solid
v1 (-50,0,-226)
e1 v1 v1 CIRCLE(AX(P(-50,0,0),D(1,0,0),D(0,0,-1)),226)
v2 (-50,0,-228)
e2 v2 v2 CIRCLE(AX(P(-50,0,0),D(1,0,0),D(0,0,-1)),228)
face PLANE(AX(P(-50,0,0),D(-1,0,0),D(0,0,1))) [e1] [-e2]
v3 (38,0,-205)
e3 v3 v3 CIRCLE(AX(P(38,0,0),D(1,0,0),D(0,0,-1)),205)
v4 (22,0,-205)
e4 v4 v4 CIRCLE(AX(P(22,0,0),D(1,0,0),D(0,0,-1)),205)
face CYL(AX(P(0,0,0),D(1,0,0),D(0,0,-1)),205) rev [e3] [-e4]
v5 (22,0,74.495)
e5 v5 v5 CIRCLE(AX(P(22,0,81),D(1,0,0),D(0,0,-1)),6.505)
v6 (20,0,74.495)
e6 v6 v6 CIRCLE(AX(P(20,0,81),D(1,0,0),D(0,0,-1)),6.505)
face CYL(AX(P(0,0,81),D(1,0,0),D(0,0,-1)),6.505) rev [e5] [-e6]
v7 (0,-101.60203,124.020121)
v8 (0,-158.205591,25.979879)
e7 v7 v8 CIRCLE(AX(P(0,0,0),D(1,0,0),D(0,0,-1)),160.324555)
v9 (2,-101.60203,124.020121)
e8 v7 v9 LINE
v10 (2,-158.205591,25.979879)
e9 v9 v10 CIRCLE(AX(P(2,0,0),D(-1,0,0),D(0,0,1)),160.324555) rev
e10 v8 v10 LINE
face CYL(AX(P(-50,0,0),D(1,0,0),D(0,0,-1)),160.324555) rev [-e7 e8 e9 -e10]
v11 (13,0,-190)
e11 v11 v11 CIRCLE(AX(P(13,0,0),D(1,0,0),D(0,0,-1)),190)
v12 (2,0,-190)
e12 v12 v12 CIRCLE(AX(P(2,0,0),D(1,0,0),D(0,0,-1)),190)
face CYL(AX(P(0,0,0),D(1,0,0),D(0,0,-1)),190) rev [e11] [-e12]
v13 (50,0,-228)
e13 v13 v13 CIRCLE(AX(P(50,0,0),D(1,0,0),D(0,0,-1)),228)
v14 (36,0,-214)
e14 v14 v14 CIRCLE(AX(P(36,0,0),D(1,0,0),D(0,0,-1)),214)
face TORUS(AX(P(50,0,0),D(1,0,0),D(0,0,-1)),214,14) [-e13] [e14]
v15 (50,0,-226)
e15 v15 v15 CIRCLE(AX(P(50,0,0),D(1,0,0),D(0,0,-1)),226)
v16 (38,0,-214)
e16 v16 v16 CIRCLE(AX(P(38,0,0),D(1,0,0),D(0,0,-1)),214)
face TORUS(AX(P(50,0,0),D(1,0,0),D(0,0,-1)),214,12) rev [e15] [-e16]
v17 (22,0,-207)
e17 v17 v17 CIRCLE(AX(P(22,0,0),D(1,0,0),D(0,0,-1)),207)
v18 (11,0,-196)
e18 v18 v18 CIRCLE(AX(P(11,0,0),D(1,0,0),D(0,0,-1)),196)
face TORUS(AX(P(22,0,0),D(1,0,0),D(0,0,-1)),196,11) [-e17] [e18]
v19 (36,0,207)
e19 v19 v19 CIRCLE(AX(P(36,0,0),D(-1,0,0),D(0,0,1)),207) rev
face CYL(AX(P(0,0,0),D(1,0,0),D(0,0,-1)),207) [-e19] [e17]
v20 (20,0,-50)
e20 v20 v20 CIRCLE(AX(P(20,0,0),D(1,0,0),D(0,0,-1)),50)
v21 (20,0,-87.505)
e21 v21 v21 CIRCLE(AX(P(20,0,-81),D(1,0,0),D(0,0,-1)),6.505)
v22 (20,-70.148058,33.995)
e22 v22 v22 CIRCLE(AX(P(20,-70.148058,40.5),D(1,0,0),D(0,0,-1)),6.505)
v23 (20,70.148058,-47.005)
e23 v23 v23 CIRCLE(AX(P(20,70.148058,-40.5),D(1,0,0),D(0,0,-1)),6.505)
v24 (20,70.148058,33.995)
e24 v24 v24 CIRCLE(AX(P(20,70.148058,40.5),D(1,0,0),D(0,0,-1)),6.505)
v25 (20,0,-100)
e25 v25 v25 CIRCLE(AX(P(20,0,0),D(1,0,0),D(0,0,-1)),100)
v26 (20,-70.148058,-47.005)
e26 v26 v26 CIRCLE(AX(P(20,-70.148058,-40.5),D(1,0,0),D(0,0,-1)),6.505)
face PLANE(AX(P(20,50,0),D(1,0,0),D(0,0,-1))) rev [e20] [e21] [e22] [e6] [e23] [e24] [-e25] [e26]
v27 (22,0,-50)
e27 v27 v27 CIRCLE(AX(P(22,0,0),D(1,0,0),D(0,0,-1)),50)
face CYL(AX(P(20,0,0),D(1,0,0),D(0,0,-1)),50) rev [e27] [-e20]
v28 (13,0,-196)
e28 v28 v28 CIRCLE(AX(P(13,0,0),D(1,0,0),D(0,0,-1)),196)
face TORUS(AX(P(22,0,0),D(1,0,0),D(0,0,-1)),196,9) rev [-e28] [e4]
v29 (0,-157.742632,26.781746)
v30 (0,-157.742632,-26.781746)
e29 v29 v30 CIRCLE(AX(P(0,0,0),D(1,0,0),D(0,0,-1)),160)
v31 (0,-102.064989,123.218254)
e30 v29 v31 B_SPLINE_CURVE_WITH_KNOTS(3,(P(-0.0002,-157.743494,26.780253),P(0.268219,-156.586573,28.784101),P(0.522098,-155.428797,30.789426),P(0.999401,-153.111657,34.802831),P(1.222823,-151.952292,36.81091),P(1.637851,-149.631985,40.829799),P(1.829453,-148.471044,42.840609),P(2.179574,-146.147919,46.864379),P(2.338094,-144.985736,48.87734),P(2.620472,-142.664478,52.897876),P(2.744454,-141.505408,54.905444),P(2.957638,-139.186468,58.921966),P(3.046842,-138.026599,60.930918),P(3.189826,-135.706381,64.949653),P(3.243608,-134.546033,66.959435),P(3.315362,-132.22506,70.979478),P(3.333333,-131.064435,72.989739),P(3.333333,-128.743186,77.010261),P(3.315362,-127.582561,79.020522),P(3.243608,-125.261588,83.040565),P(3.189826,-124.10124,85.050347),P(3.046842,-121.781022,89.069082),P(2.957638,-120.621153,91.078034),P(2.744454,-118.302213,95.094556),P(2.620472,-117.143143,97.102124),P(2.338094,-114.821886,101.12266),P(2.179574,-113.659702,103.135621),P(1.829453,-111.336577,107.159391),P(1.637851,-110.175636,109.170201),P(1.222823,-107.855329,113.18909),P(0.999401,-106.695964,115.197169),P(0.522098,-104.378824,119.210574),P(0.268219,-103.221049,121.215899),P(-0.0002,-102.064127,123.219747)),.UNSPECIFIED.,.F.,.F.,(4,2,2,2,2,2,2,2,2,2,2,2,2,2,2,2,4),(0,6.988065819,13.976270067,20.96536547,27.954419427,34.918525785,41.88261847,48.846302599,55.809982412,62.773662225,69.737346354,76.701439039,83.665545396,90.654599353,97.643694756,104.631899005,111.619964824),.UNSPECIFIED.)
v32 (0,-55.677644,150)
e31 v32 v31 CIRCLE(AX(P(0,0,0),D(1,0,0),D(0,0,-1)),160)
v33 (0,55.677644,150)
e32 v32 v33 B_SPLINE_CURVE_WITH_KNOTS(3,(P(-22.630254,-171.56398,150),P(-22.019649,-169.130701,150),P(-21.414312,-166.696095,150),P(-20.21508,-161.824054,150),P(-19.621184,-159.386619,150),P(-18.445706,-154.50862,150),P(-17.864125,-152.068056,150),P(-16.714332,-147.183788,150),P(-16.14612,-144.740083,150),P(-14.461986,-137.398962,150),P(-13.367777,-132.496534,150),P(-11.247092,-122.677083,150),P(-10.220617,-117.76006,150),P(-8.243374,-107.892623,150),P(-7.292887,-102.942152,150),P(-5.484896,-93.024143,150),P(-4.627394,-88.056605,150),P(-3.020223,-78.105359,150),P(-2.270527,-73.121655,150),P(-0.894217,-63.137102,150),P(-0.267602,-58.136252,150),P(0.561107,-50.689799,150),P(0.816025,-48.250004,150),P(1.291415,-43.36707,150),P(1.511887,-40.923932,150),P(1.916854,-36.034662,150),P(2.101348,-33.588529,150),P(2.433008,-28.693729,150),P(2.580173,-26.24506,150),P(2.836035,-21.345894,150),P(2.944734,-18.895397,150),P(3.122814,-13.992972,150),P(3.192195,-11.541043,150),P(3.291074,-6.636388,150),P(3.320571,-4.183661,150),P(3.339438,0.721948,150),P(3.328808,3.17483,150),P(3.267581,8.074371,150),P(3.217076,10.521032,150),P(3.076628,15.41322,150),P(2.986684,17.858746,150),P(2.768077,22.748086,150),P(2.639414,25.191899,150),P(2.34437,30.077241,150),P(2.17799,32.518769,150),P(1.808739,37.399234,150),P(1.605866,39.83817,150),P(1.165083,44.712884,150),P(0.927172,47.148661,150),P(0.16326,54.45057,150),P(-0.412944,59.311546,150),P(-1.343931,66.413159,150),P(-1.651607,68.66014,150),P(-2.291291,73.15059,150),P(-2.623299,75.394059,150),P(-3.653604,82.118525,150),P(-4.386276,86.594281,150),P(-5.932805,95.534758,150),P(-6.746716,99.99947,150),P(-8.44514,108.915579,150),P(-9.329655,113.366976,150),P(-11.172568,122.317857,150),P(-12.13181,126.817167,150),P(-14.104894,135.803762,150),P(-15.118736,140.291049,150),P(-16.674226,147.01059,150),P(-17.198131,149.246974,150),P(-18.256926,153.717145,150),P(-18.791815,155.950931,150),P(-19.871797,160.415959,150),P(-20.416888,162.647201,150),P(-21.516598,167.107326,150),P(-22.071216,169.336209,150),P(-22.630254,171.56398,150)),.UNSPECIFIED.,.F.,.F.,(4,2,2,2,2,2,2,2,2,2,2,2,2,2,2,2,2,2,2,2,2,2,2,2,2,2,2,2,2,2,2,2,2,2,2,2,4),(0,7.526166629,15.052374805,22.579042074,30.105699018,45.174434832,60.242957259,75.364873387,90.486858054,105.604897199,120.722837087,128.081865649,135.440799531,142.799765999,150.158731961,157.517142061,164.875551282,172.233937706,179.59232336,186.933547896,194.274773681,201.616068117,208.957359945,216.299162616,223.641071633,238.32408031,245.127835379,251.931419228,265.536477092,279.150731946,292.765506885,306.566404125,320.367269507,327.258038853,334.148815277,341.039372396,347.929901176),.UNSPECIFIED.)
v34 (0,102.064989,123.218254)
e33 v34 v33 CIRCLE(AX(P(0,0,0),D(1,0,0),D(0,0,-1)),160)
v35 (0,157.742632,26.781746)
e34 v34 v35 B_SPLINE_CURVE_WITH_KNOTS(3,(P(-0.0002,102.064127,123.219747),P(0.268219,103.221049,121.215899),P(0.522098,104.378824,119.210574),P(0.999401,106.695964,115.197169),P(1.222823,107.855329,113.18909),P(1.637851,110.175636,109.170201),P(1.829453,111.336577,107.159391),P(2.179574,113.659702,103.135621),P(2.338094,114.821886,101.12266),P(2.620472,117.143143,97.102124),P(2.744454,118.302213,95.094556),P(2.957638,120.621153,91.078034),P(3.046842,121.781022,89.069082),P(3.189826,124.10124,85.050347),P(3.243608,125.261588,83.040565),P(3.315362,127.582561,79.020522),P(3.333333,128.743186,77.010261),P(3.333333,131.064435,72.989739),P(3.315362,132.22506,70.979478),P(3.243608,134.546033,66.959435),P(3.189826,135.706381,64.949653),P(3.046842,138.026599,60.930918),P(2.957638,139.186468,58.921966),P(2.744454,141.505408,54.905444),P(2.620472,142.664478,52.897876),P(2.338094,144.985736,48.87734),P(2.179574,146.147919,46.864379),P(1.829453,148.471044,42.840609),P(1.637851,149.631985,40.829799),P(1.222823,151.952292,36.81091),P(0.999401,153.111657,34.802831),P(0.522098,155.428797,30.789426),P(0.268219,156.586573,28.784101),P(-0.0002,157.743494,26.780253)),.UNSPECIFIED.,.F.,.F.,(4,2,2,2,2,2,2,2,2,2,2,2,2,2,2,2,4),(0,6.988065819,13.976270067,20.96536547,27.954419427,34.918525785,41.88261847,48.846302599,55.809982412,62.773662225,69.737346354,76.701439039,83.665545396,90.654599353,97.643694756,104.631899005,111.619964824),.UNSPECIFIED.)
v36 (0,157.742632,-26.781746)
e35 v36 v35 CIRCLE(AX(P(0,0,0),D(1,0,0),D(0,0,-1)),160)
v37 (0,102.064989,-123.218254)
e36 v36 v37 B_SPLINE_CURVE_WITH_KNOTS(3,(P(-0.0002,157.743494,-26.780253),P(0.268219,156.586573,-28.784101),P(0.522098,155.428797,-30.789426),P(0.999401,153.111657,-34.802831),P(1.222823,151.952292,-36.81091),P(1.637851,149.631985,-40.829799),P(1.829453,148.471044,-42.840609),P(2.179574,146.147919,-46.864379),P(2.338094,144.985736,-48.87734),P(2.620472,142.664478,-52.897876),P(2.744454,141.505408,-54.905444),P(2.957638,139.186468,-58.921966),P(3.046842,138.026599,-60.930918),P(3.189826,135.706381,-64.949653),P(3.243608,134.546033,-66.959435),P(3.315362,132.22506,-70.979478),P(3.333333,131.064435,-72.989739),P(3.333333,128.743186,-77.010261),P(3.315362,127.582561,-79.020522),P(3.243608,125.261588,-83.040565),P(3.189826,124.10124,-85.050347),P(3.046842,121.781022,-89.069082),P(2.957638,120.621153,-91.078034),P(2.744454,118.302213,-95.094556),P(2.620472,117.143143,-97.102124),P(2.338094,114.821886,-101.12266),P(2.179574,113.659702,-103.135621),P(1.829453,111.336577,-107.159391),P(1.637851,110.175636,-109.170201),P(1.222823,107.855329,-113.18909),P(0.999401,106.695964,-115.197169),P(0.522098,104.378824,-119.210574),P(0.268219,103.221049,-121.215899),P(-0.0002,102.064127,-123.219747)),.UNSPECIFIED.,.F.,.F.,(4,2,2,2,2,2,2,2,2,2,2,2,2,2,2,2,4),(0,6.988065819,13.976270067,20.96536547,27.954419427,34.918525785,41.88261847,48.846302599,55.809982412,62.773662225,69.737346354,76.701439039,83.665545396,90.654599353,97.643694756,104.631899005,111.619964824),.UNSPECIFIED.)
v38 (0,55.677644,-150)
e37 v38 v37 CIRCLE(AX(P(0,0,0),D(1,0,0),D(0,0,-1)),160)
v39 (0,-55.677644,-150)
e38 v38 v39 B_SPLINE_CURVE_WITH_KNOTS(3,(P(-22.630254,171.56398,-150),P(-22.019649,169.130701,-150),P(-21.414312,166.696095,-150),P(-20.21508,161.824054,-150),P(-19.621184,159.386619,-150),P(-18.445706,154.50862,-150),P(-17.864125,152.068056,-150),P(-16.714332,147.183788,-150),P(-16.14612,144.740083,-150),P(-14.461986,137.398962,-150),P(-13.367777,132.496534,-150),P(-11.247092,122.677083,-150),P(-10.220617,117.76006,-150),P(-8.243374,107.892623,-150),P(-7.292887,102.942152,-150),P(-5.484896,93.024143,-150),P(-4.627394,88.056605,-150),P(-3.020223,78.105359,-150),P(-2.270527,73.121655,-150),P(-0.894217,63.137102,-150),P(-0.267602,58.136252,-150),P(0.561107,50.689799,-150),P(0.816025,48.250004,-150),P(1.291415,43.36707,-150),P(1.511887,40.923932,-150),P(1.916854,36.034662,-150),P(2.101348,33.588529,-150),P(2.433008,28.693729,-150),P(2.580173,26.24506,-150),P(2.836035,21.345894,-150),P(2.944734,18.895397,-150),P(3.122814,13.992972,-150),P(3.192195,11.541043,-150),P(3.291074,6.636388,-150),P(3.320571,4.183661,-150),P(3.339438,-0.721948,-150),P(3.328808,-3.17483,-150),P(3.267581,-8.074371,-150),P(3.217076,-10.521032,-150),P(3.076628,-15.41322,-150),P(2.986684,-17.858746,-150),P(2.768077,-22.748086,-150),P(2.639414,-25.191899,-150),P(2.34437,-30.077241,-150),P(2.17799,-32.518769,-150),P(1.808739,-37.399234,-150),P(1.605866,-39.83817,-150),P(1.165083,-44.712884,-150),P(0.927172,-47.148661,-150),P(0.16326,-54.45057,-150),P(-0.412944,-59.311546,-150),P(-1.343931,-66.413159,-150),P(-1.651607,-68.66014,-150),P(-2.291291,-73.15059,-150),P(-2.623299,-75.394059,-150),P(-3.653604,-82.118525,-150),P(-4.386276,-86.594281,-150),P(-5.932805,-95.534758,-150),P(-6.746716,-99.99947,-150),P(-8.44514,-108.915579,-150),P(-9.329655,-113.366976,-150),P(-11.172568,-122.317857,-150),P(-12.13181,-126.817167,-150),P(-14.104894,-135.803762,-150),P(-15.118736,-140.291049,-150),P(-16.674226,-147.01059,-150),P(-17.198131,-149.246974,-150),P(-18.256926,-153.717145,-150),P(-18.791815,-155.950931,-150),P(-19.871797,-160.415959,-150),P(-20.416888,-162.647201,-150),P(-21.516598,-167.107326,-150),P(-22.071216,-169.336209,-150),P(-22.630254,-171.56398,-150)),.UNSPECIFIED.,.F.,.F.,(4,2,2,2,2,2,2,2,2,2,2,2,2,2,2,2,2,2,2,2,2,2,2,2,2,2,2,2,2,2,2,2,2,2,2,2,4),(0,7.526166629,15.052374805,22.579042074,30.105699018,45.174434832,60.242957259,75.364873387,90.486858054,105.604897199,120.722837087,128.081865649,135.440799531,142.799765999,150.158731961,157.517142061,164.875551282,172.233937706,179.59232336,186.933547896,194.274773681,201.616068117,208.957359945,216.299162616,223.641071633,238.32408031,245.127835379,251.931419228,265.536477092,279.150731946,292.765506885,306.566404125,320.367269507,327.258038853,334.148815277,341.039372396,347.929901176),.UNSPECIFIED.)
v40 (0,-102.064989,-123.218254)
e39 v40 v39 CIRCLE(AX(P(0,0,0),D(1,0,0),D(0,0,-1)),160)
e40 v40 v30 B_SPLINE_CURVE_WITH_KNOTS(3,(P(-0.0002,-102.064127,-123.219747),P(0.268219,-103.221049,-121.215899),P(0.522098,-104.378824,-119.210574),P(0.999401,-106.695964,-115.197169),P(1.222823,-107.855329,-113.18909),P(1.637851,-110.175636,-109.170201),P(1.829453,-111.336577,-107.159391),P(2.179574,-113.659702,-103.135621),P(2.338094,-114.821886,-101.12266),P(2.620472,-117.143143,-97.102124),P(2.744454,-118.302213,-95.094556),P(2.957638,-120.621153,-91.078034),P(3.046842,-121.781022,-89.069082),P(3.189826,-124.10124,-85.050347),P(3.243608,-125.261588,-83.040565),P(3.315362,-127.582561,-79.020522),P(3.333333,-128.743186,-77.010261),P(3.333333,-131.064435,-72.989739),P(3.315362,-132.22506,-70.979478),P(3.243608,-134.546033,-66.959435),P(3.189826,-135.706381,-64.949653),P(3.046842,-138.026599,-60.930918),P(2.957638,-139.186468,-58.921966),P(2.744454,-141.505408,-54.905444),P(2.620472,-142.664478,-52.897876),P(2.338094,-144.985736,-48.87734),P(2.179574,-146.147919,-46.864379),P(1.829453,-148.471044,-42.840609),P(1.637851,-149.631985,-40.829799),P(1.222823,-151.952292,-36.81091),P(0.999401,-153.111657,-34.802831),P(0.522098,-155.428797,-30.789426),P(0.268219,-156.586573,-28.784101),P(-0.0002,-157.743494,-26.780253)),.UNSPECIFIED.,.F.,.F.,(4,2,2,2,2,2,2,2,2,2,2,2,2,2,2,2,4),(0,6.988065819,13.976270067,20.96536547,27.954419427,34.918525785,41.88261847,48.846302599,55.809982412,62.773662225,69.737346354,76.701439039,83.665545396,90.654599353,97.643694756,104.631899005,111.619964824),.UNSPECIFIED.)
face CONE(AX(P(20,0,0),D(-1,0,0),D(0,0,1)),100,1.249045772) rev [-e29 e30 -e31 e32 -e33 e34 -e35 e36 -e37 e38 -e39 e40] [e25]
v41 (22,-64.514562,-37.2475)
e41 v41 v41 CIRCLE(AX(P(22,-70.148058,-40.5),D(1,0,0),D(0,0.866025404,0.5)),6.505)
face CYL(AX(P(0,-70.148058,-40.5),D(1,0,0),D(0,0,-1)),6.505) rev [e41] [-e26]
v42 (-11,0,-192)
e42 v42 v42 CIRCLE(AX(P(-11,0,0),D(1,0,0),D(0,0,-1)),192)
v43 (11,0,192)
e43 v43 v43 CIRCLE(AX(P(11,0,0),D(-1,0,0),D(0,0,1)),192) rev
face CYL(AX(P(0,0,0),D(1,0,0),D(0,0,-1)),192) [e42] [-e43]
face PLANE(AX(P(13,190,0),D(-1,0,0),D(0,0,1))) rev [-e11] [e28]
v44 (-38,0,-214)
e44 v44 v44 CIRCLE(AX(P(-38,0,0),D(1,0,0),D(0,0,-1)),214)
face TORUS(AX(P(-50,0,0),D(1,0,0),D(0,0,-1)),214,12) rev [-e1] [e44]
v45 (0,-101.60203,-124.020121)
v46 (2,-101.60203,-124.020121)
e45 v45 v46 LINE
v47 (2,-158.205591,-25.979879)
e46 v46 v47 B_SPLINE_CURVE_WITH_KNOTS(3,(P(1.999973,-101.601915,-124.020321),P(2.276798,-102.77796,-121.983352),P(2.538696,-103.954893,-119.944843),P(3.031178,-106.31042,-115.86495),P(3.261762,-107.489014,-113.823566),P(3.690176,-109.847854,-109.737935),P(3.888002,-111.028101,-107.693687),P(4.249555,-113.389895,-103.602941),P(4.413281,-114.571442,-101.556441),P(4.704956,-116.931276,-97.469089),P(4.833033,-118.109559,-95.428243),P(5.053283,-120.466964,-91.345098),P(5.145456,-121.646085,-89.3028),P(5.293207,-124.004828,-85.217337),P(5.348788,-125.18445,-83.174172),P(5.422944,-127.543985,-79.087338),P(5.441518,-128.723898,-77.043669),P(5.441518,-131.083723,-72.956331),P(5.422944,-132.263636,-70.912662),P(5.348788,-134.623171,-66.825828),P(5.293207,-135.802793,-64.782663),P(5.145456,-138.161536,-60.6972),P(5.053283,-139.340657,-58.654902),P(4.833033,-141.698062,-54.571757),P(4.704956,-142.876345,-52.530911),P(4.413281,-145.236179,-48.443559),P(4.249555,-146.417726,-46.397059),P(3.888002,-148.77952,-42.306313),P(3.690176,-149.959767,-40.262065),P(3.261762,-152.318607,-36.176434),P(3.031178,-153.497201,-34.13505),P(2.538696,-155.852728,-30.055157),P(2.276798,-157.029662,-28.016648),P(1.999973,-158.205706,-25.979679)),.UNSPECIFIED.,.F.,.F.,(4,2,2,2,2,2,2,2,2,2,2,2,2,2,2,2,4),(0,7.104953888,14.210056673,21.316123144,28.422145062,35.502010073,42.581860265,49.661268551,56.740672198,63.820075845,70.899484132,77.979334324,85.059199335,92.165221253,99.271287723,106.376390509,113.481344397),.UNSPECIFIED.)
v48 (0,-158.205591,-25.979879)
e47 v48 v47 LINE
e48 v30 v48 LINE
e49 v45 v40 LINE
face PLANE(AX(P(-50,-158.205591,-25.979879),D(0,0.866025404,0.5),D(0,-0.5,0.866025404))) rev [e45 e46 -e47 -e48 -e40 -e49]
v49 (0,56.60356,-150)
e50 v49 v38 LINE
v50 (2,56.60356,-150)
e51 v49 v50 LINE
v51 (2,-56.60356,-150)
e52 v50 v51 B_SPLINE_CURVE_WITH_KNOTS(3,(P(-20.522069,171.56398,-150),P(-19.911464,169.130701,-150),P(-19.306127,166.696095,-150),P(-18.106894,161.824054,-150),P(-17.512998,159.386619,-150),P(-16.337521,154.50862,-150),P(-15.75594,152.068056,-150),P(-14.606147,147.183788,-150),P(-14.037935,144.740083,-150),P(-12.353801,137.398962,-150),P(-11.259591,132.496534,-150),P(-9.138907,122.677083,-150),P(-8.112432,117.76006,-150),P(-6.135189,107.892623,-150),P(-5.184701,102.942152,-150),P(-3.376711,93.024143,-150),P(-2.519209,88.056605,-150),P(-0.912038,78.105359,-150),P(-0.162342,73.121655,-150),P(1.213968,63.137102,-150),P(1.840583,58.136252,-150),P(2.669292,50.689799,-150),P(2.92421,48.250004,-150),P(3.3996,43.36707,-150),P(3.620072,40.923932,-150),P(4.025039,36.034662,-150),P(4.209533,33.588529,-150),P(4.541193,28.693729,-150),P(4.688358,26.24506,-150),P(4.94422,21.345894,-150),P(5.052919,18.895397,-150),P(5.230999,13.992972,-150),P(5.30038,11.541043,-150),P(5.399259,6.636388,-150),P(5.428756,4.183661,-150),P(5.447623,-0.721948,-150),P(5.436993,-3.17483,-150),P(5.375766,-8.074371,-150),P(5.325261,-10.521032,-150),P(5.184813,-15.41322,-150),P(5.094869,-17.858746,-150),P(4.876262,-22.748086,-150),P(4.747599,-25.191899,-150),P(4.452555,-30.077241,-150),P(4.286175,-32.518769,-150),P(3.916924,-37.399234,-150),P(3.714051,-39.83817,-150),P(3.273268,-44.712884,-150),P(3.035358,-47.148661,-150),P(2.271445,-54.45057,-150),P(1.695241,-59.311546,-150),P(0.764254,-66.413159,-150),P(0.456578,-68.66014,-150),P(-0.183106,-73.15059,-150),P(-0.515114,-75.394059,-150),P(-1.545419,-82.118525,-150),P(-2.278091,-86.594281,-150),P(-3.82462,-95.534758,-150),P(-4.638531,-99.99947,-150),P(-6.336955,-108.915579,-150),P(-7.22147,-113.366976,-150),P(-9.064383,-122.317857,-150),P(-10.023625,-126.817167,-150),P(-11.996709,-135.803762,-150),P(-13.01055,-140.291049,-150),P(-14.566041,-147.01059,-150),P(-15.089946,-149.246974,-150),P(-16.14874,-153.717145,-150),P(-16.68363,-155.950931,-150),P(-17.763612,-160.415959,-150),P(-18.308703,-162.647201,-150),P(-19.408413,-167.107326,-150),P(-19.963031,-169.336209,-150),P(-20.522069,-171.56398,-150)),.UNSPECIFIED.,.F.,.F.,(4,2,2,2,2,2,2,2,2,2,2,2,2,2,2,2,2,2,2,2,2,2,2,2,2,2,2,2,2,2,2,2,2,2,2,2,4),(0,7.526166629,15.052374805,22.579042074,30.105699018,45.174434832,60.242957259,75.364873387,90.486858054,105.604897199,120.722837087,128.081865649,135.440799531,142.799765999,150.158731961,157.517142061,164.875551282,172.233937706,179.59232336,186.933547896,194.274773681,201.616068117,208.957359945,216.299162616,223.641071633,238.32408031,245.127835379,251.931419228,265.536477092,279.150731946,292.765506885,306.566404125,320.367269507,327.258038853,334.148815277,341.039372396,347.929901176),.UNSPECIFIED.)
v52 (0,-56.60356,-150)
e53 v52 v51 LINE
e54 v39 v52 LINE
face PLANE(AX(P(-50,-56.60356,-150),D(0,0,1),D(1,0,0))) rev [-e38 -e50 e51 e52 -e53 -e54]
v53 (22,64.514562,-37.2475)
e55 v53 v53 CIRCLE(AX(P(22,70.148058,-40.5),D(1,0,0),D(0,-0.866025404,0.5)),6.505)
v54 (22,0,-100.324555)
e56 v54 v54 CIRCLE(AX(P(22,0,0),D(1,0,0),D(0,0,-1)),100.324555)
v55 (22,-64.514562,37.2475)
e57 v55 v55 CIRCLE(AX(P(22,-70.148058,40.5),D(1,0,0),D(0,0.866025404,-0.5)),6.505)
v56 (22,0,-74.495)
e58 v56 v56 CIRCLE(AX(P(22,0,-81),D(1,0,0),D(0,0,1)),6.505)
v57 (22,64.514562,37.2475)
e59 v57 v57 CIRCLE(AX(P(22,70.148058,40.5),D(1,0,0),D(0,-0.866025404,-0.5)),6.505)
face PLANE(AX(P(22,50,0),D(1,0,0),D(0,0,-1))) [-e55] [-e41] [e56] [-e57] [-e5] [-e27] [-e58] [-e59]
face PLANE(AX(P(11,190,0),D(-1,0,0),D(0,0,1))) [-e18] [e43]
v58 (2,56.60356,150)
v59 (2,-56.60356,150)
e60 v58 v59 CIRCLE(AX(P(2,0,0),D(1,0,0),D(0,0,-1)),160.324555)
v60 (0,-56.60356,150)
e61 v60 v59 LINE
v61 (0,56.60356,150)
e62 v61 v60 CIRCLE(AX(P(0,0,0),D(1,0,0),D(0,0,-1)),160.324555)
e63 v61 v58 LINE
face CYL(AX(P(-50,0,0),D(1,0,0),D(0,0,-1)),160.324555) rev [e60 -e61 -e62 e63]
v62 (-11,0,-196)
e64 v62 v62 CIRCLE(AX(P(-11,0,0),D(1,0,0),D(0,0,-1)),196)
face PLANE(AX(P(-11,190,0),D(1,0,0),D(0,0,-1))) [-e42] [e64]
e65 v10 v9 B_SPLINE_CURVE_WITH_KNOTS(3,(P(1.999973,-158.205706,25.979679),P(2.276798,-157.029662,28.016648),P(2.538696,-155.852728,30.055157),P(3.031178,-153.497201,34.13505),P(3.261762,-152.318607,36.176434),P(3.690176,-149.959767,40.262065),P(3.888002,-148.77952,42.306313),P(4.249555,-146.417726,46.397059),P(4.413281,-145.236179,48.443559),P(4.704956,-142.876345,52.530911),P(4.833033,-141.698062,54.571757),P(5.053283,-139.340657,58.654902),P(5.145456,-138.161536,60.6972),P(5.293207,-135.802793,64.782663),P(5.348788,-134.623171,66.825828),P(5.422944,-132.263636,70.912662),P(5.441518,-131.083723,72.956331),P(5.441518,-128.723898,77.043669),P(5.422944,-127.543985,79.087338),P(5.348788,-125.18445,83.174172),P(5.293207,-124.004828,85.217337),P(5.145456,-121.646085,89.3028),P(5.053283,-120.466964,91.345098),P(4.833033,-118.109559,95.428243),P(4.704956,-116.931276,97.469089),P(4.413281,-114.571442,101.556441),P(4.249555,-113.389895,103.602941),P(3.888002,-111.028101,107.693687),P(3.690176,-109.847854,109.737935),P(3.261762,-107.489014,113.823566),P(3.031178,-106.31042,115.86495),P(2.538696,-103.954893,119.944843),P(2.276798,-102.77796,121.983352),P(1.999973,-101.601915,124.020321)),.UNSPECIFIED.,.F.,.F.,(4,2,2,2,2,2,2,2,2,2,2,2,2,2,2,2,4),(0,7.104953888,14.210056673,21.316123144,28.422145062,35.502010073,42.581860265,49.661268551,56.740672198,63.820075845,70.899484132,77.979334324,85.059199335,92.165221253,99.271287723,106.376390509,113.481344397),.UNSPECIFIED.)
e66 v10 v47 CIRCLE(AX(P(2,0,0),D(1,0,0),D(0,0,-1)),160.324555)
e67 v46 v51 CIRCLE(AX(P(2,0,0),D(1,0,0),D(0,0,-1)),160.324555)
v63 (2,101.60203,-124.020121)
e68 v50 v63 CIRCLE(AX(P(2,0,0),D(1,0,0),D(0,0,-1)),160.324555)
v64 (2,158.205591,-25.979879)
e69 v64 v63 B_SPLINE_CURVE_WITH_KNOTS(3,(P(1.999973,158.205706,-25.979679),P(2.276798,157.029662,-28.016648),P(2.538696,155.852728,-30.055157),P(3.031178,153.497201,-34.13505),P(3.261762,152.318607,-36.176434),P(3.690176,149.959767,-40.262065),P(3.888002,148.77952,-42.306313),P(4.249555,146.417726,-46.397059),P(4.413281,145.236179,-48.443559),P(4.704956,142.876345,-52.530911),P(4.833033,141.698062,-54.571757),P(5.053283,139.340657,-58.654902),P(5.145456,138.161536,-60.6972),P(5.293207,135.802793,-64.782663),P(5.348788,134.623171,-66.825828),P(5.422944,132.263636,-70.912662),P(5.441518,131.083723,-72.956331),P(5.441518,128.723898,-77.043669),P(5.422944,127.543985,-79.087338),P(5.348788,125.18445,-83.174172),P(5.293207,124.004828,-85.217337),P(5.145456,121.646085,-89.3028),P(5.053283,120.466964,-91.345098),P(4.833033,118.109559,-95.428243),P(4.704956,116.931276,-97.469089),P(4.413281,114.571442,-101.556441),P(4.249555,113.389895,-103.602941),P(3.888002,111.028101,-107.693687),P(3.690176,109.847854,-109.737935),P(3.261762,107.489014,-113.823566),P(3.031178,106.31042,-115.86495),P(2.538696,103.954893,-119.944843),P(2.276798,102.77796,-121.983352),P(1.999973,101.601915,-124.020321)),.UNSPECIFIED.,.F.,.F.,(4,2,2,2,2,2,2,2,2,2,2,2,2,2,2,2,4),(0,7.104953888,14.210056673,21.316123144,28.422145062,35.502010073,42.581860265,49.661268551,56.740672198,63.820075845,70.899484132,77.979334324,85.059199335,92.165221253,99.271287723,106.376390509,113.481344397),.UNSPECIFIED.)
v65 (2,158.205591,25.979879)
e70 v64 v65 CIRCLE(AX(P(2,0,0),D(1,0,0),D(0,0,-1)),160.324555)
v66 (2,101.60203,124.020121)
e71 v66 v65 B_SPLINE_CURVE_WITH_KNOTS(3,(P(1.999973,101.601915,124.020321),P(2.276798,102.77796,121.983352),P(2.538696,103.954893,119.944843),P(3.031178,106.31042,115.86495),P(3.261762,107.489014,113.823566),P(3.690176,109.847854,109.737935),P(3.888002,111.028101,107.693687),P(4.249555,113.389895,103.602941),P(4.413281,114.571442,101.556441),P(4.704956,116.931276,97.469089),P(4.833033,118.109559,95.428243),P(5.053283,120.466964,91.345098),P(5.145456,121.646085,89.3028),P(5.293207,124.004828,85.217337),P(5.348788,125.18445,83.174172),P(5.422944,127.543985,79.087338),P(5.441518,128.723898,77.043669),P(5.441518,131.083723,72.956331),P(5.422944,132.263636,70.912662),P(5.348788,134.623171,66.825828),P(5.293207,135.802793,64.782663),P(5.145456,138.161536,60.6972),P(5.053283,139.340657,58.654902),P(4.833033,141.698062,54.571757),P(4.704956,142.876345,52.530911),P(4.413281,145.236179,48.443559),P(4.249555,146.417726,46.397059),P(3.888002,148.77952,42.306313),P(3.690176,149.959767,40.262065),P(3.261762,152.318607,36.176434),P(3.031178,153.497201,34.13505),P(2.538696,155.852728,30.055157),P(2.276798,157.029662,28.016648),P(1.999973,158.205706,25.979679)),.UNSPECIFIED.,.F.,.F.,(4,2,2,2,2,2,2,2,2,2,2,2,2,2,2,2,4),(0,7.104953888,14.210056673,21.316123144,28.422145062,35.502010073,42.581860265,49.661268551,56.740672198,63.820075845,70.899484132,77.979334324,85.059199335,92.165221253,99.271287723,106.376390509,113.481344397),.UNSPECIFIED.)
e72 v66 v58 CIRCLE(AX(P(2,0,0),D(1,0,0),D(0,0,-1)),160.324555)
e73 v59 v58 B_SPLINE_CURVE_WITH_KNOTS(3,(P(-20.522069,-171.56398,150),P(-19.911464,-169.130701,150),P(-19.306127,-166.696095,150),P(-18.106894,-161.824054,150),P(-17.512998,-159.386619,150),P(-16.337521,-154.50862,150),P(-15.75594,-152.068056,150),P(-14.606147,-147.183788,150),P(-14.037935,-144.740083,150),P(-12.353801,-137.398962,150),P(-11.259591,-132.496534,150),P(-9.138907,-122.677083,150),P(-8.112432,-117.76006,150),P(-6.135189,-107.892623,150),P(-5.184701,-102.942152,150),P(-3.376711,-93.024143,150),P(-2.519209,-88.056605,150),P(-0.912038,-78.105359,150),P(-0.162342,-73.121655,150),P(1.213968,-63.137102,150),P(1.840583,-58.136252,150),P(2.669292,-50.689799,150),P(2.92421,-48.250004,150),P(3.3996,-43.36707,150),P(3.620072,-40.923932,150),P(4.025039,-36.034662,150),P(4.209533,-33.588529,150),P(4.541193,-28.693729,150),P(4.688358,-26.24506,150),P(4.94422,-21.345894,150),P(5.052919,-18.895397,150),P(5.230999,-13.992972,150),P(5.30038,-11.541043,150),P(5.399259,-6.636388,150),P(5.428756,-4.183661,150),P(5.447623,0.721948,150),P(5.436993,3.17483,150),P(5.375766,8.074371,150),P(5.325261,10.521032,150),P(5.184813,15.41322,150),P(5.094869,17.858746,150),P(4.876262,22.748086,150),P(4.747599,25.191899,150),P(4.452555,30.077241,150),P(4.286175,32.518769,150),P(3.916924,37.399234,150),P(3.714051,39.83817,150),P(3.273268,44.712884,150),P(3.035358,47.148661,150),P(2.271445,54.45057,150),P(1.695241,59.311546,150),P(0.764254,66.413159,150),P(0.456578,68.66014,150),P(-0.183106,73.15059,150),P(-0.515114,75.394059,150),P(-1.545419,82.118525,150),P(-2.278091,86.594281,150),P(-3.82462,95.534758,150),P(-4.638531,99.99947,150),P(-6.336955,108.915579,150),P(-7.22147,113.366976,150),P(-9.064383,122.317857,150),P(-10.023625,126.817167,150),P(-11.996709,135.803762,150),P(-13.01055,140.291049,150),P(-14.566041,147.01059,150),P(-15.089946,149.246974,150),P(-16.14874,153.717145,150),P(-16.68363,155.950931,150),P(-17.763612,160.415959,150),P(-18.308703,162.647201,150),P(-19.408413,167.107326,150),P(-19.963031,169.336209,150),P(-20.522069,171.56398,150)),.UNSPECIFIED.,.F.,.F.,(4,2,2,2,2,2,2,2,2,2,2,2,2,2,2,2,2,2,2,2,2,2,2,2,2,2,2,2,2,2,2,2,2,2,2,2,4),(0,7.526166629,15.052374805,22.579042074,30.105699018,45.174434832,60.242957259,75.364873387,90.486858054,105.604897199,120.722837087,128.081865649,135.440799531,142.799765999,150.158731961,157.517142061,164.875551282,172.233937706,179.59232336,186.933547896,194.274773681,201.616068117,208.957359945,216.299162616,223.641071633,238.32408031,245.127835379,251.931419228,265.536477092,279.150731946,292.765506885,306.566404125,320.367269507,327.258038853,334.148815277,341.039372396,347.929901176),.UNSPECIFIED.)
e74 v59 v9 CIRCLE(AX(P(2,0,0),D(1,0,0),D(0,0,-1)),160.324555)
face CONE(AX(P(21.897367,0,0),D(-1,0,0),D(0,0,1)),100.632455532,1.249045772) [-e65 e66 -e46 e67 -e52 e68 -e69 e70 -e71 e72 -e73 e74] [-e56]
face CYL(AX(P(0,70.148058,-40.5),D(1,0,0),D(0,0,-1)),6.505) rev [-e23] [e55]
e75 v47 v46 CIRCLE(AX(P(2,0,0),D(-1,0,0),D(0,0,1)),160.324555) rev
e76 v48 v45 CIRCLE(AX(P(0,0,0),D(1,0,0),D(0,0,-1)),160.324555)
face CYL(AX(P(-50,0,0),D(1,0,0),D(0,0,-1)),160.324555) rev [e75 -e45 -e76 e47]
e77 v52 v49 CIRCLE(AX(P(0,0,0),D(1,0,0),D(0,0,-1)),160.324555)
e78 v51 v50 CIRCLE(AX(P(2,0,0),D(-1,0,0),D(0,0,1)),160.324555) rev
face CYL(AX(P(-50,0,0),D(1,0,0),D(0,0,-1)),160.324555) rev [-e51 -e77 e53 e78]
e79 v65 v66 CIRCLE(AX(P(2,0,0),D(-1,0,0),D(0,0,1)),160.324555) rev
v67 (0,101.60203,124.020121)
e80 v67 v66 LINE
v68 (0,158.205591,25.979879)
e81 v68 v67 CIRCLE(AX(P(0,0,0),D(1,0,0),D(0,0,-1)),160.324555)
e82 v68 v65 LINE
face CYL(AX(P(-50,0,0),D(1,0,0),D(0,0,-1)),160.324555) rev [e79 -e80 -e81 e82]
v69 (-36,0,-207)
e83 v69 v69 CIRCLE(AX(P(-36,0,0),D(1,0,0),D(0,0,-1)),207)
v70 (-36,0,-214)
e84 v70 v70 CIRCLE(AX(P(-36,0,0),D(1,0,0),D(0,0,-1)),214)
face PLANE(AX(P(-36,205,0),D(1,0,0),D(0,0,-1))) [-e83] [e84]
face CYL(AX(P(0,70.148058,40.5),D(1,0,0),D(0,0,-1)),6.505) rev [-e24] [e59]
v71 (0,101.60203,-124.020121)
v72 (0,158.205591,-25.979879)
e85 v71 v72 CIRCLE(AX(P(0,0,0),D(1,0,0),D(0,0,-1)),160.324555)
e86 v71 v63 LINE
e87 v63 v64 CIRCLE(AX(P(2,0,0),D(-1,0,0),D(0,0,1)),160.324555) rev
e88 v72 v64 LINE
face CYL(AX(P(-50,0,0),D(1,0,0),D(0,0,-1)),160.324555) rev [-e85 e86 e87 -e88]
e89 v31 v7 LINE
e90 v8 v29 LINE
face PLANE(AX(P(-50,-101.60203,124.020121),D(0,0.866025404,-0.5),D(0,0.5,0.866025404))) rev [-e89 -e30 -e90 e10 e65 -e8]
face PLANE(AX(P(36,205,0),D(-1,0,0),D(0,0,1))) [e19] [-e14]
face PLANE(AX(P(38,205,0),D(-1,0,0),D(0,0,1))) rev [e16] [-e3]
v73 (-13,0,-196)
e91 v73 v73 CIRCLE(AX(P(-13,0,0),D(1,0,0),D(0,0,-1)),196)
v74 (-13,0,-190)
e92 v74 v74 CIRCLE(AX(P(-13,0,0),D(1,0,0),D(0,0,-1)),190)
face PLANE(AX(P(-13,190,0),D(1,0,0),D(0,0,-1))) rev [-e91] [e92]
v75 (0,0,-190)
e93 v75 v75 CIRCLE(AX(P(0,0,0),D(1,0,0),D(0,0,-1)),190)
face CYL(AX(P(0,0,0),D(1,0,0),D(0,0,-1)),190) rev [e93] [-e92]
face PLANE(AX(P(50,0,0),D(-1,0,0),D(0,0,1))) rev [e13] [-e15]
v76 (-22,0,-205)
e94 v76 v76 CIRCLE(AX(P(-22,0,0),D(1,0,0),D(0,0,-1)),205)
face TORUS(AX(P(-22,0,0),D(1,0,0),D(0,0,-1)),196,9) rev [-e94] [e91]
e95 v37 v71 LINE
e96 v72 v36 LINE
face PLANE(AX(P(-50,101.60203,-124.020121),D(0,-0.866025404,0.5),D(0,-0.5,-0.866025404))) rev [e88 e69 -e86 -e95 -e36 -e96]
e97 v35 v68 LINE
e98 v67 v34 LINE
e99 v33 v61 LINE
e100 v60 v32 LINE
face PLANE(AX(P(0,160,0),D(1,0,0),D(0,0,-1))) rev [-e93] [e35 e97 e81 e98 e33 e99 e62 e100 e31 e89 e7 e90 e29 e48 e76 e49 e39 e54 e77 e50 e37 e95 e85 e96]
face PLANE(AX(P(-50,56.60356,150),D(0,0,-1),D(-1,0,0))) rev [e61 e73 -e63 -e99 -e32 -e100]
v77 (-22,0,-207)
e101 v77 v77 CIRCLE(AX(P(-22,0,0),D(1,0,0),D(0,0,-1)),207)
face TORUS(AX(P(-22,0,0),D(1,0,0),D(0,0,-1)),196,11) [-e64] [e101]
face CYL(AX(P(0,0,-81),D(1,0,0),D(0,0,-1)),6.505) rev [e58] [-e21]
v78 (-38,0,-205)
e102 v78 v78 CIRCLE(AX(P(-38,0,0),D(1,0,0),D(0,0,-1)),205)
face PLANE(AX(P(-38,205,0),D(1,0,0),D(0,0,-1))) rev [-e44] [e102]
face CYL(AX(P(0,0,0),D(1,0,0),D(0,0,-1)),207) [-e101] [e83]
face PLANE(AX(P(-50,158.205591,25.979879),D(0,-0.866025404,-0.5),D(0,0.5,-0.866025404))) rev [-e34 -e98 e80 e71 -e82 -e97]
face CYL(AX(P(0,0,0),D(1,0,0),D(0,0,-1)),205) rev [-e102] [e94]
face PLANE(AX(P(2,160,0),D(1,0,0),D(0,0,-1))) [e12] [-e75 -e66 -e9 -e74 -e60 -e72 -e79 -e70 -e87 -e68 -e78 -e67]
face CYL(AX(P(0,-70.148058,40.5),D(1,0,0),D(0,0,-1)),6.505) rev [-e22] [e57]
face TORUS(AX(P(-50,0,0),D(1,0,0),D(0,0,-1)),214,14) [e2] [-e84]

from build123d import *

# Parameters (mm, degrees)
CUT_EXTRUDE1_DEPTH = 331.381597619
SKETCH3_R          = 6.505
CUT_EXTRUDE2_DEPTH = 22
CIRPATTERN1_COUNT  = 6


# Read off the part's stored shape, not the designer's step: Thicken1, Thicken2
with BuildPart() as part:
    # Thicken1 outline → Thicken1 (revolve)
    with BuildSketch(Plane.YX):
        Polygon((50, 22), (50, 20), (100, 20), (160, 0), (190, 0), (190, 2), (160.32455532, 2), (100.32455532, 22), align=None)
    revolve(axis=Axis((0, 0, 0), (1, 0, 0)))

    # Thicken2 outline → Thicken2 (revolve)
    with BuildSketch(Plane.YX):
        with BuildLine():
            Line((190, -13), (196, -13))
            ThreePointArc((196, -13), (202.363961031, -15.636038969), (205, -22))
            Line((205, -22), (205, -38))
            Line((205, -38), (214, -38))
            ThreePointArc((214, -38), (222.485281374, -41.514718626), (226, -50))
            Line((226, -50), (228, -50))
            ThreePointArc((228, -50), (223.899494937, -40.100505063), (214, -36))
            Line((214, -36), (207, -36))
            Line((207, -36), (207, -22))
            ThreePointArc((207, -22), (203.778174593, -14.221825407), (196, -11))
            Line((196, -11), (192, -11))
            Line((192, -11), (192, 11))
            Line((192, 11), (196, 11))
            ThreePointArc((196, 11), (203.778174593, 14.221825407), (207, 22))
            Line((207, 22), (207, 36))
            Line((207, 36), (214, 36))
            ThreePointArc((214, 36), (223.899494937, 40.100505063), (228, 50))
            Line((228, 50), (226, 50))
            ThreePointArc((226, 50), (222.485281374, 41.514718626), (214, 38))
            Line((214, 38), (205, 38))
            Line((205, 38), (205, 22))
            ThreePointArc((205, 22), (202.363961031, 15.636038969), (196, 13))
            Line((196, 13), (190, 13))
            Line((190, 13), (190, -13))
        make_face()
    revolve(axis=Axis((0, 0, 0), (1, 0, 0)))

    # Sketch2 → Cut-Extrude1 (cut, through all)
    with BuildSketch(Plane(origin=(22, 0, 0), x_dir=(0, 0, -1), z_dir=(1, 0, 0))):
        with BuildLine():
            Line((-150, 56.6035603), (-150, -56.6035603))
            ThreePointArc((-150, -56.6035603), (-160.32455532, 0), (-150, 56.6035603))
        make_face()
    cut_extrude1 = extrude(amount=-CUT_EXTRUDE1_DEPTH, mode=Mode.SUBTRACT)

    # Sketch3 → Cut-Extrude2 (cut)
    with BuildSketch(Plane(origin=(22, 0, 0), x_dir=(0, 0, -1), z_dir=(1, 0, 0))):
        with Locations((-81, 0)):
            Circle(SKETCH3_R)
    cut_extrude2 = extrude(amount=-CUT_EXTRUDE2_DEPTH, mode=Mode.SUBTRACT)

    # CirPattern1: Cut-Extrude1, Cut-Extrude2 ×6 about axis
    cirpattern1_axis = Axis((0, 0, 0), (1, 0, 0))
    add([cut_extrude1.rotate(cirpattern1_axis, i * 360 / CIRPATTERN1_COUNT) for i in range(1, CIRPATTERN1_COUNT)], mode=Mode.SUBTRACT)
    add([cut_extrude2.rotate(cirpattern1_axis, i * 360 / CIRPATTERN1_COUNT) for i in range(1, CIRPATTERN1_COUNT)], mode=Mode.SUBTRACT)


solid = part.part
